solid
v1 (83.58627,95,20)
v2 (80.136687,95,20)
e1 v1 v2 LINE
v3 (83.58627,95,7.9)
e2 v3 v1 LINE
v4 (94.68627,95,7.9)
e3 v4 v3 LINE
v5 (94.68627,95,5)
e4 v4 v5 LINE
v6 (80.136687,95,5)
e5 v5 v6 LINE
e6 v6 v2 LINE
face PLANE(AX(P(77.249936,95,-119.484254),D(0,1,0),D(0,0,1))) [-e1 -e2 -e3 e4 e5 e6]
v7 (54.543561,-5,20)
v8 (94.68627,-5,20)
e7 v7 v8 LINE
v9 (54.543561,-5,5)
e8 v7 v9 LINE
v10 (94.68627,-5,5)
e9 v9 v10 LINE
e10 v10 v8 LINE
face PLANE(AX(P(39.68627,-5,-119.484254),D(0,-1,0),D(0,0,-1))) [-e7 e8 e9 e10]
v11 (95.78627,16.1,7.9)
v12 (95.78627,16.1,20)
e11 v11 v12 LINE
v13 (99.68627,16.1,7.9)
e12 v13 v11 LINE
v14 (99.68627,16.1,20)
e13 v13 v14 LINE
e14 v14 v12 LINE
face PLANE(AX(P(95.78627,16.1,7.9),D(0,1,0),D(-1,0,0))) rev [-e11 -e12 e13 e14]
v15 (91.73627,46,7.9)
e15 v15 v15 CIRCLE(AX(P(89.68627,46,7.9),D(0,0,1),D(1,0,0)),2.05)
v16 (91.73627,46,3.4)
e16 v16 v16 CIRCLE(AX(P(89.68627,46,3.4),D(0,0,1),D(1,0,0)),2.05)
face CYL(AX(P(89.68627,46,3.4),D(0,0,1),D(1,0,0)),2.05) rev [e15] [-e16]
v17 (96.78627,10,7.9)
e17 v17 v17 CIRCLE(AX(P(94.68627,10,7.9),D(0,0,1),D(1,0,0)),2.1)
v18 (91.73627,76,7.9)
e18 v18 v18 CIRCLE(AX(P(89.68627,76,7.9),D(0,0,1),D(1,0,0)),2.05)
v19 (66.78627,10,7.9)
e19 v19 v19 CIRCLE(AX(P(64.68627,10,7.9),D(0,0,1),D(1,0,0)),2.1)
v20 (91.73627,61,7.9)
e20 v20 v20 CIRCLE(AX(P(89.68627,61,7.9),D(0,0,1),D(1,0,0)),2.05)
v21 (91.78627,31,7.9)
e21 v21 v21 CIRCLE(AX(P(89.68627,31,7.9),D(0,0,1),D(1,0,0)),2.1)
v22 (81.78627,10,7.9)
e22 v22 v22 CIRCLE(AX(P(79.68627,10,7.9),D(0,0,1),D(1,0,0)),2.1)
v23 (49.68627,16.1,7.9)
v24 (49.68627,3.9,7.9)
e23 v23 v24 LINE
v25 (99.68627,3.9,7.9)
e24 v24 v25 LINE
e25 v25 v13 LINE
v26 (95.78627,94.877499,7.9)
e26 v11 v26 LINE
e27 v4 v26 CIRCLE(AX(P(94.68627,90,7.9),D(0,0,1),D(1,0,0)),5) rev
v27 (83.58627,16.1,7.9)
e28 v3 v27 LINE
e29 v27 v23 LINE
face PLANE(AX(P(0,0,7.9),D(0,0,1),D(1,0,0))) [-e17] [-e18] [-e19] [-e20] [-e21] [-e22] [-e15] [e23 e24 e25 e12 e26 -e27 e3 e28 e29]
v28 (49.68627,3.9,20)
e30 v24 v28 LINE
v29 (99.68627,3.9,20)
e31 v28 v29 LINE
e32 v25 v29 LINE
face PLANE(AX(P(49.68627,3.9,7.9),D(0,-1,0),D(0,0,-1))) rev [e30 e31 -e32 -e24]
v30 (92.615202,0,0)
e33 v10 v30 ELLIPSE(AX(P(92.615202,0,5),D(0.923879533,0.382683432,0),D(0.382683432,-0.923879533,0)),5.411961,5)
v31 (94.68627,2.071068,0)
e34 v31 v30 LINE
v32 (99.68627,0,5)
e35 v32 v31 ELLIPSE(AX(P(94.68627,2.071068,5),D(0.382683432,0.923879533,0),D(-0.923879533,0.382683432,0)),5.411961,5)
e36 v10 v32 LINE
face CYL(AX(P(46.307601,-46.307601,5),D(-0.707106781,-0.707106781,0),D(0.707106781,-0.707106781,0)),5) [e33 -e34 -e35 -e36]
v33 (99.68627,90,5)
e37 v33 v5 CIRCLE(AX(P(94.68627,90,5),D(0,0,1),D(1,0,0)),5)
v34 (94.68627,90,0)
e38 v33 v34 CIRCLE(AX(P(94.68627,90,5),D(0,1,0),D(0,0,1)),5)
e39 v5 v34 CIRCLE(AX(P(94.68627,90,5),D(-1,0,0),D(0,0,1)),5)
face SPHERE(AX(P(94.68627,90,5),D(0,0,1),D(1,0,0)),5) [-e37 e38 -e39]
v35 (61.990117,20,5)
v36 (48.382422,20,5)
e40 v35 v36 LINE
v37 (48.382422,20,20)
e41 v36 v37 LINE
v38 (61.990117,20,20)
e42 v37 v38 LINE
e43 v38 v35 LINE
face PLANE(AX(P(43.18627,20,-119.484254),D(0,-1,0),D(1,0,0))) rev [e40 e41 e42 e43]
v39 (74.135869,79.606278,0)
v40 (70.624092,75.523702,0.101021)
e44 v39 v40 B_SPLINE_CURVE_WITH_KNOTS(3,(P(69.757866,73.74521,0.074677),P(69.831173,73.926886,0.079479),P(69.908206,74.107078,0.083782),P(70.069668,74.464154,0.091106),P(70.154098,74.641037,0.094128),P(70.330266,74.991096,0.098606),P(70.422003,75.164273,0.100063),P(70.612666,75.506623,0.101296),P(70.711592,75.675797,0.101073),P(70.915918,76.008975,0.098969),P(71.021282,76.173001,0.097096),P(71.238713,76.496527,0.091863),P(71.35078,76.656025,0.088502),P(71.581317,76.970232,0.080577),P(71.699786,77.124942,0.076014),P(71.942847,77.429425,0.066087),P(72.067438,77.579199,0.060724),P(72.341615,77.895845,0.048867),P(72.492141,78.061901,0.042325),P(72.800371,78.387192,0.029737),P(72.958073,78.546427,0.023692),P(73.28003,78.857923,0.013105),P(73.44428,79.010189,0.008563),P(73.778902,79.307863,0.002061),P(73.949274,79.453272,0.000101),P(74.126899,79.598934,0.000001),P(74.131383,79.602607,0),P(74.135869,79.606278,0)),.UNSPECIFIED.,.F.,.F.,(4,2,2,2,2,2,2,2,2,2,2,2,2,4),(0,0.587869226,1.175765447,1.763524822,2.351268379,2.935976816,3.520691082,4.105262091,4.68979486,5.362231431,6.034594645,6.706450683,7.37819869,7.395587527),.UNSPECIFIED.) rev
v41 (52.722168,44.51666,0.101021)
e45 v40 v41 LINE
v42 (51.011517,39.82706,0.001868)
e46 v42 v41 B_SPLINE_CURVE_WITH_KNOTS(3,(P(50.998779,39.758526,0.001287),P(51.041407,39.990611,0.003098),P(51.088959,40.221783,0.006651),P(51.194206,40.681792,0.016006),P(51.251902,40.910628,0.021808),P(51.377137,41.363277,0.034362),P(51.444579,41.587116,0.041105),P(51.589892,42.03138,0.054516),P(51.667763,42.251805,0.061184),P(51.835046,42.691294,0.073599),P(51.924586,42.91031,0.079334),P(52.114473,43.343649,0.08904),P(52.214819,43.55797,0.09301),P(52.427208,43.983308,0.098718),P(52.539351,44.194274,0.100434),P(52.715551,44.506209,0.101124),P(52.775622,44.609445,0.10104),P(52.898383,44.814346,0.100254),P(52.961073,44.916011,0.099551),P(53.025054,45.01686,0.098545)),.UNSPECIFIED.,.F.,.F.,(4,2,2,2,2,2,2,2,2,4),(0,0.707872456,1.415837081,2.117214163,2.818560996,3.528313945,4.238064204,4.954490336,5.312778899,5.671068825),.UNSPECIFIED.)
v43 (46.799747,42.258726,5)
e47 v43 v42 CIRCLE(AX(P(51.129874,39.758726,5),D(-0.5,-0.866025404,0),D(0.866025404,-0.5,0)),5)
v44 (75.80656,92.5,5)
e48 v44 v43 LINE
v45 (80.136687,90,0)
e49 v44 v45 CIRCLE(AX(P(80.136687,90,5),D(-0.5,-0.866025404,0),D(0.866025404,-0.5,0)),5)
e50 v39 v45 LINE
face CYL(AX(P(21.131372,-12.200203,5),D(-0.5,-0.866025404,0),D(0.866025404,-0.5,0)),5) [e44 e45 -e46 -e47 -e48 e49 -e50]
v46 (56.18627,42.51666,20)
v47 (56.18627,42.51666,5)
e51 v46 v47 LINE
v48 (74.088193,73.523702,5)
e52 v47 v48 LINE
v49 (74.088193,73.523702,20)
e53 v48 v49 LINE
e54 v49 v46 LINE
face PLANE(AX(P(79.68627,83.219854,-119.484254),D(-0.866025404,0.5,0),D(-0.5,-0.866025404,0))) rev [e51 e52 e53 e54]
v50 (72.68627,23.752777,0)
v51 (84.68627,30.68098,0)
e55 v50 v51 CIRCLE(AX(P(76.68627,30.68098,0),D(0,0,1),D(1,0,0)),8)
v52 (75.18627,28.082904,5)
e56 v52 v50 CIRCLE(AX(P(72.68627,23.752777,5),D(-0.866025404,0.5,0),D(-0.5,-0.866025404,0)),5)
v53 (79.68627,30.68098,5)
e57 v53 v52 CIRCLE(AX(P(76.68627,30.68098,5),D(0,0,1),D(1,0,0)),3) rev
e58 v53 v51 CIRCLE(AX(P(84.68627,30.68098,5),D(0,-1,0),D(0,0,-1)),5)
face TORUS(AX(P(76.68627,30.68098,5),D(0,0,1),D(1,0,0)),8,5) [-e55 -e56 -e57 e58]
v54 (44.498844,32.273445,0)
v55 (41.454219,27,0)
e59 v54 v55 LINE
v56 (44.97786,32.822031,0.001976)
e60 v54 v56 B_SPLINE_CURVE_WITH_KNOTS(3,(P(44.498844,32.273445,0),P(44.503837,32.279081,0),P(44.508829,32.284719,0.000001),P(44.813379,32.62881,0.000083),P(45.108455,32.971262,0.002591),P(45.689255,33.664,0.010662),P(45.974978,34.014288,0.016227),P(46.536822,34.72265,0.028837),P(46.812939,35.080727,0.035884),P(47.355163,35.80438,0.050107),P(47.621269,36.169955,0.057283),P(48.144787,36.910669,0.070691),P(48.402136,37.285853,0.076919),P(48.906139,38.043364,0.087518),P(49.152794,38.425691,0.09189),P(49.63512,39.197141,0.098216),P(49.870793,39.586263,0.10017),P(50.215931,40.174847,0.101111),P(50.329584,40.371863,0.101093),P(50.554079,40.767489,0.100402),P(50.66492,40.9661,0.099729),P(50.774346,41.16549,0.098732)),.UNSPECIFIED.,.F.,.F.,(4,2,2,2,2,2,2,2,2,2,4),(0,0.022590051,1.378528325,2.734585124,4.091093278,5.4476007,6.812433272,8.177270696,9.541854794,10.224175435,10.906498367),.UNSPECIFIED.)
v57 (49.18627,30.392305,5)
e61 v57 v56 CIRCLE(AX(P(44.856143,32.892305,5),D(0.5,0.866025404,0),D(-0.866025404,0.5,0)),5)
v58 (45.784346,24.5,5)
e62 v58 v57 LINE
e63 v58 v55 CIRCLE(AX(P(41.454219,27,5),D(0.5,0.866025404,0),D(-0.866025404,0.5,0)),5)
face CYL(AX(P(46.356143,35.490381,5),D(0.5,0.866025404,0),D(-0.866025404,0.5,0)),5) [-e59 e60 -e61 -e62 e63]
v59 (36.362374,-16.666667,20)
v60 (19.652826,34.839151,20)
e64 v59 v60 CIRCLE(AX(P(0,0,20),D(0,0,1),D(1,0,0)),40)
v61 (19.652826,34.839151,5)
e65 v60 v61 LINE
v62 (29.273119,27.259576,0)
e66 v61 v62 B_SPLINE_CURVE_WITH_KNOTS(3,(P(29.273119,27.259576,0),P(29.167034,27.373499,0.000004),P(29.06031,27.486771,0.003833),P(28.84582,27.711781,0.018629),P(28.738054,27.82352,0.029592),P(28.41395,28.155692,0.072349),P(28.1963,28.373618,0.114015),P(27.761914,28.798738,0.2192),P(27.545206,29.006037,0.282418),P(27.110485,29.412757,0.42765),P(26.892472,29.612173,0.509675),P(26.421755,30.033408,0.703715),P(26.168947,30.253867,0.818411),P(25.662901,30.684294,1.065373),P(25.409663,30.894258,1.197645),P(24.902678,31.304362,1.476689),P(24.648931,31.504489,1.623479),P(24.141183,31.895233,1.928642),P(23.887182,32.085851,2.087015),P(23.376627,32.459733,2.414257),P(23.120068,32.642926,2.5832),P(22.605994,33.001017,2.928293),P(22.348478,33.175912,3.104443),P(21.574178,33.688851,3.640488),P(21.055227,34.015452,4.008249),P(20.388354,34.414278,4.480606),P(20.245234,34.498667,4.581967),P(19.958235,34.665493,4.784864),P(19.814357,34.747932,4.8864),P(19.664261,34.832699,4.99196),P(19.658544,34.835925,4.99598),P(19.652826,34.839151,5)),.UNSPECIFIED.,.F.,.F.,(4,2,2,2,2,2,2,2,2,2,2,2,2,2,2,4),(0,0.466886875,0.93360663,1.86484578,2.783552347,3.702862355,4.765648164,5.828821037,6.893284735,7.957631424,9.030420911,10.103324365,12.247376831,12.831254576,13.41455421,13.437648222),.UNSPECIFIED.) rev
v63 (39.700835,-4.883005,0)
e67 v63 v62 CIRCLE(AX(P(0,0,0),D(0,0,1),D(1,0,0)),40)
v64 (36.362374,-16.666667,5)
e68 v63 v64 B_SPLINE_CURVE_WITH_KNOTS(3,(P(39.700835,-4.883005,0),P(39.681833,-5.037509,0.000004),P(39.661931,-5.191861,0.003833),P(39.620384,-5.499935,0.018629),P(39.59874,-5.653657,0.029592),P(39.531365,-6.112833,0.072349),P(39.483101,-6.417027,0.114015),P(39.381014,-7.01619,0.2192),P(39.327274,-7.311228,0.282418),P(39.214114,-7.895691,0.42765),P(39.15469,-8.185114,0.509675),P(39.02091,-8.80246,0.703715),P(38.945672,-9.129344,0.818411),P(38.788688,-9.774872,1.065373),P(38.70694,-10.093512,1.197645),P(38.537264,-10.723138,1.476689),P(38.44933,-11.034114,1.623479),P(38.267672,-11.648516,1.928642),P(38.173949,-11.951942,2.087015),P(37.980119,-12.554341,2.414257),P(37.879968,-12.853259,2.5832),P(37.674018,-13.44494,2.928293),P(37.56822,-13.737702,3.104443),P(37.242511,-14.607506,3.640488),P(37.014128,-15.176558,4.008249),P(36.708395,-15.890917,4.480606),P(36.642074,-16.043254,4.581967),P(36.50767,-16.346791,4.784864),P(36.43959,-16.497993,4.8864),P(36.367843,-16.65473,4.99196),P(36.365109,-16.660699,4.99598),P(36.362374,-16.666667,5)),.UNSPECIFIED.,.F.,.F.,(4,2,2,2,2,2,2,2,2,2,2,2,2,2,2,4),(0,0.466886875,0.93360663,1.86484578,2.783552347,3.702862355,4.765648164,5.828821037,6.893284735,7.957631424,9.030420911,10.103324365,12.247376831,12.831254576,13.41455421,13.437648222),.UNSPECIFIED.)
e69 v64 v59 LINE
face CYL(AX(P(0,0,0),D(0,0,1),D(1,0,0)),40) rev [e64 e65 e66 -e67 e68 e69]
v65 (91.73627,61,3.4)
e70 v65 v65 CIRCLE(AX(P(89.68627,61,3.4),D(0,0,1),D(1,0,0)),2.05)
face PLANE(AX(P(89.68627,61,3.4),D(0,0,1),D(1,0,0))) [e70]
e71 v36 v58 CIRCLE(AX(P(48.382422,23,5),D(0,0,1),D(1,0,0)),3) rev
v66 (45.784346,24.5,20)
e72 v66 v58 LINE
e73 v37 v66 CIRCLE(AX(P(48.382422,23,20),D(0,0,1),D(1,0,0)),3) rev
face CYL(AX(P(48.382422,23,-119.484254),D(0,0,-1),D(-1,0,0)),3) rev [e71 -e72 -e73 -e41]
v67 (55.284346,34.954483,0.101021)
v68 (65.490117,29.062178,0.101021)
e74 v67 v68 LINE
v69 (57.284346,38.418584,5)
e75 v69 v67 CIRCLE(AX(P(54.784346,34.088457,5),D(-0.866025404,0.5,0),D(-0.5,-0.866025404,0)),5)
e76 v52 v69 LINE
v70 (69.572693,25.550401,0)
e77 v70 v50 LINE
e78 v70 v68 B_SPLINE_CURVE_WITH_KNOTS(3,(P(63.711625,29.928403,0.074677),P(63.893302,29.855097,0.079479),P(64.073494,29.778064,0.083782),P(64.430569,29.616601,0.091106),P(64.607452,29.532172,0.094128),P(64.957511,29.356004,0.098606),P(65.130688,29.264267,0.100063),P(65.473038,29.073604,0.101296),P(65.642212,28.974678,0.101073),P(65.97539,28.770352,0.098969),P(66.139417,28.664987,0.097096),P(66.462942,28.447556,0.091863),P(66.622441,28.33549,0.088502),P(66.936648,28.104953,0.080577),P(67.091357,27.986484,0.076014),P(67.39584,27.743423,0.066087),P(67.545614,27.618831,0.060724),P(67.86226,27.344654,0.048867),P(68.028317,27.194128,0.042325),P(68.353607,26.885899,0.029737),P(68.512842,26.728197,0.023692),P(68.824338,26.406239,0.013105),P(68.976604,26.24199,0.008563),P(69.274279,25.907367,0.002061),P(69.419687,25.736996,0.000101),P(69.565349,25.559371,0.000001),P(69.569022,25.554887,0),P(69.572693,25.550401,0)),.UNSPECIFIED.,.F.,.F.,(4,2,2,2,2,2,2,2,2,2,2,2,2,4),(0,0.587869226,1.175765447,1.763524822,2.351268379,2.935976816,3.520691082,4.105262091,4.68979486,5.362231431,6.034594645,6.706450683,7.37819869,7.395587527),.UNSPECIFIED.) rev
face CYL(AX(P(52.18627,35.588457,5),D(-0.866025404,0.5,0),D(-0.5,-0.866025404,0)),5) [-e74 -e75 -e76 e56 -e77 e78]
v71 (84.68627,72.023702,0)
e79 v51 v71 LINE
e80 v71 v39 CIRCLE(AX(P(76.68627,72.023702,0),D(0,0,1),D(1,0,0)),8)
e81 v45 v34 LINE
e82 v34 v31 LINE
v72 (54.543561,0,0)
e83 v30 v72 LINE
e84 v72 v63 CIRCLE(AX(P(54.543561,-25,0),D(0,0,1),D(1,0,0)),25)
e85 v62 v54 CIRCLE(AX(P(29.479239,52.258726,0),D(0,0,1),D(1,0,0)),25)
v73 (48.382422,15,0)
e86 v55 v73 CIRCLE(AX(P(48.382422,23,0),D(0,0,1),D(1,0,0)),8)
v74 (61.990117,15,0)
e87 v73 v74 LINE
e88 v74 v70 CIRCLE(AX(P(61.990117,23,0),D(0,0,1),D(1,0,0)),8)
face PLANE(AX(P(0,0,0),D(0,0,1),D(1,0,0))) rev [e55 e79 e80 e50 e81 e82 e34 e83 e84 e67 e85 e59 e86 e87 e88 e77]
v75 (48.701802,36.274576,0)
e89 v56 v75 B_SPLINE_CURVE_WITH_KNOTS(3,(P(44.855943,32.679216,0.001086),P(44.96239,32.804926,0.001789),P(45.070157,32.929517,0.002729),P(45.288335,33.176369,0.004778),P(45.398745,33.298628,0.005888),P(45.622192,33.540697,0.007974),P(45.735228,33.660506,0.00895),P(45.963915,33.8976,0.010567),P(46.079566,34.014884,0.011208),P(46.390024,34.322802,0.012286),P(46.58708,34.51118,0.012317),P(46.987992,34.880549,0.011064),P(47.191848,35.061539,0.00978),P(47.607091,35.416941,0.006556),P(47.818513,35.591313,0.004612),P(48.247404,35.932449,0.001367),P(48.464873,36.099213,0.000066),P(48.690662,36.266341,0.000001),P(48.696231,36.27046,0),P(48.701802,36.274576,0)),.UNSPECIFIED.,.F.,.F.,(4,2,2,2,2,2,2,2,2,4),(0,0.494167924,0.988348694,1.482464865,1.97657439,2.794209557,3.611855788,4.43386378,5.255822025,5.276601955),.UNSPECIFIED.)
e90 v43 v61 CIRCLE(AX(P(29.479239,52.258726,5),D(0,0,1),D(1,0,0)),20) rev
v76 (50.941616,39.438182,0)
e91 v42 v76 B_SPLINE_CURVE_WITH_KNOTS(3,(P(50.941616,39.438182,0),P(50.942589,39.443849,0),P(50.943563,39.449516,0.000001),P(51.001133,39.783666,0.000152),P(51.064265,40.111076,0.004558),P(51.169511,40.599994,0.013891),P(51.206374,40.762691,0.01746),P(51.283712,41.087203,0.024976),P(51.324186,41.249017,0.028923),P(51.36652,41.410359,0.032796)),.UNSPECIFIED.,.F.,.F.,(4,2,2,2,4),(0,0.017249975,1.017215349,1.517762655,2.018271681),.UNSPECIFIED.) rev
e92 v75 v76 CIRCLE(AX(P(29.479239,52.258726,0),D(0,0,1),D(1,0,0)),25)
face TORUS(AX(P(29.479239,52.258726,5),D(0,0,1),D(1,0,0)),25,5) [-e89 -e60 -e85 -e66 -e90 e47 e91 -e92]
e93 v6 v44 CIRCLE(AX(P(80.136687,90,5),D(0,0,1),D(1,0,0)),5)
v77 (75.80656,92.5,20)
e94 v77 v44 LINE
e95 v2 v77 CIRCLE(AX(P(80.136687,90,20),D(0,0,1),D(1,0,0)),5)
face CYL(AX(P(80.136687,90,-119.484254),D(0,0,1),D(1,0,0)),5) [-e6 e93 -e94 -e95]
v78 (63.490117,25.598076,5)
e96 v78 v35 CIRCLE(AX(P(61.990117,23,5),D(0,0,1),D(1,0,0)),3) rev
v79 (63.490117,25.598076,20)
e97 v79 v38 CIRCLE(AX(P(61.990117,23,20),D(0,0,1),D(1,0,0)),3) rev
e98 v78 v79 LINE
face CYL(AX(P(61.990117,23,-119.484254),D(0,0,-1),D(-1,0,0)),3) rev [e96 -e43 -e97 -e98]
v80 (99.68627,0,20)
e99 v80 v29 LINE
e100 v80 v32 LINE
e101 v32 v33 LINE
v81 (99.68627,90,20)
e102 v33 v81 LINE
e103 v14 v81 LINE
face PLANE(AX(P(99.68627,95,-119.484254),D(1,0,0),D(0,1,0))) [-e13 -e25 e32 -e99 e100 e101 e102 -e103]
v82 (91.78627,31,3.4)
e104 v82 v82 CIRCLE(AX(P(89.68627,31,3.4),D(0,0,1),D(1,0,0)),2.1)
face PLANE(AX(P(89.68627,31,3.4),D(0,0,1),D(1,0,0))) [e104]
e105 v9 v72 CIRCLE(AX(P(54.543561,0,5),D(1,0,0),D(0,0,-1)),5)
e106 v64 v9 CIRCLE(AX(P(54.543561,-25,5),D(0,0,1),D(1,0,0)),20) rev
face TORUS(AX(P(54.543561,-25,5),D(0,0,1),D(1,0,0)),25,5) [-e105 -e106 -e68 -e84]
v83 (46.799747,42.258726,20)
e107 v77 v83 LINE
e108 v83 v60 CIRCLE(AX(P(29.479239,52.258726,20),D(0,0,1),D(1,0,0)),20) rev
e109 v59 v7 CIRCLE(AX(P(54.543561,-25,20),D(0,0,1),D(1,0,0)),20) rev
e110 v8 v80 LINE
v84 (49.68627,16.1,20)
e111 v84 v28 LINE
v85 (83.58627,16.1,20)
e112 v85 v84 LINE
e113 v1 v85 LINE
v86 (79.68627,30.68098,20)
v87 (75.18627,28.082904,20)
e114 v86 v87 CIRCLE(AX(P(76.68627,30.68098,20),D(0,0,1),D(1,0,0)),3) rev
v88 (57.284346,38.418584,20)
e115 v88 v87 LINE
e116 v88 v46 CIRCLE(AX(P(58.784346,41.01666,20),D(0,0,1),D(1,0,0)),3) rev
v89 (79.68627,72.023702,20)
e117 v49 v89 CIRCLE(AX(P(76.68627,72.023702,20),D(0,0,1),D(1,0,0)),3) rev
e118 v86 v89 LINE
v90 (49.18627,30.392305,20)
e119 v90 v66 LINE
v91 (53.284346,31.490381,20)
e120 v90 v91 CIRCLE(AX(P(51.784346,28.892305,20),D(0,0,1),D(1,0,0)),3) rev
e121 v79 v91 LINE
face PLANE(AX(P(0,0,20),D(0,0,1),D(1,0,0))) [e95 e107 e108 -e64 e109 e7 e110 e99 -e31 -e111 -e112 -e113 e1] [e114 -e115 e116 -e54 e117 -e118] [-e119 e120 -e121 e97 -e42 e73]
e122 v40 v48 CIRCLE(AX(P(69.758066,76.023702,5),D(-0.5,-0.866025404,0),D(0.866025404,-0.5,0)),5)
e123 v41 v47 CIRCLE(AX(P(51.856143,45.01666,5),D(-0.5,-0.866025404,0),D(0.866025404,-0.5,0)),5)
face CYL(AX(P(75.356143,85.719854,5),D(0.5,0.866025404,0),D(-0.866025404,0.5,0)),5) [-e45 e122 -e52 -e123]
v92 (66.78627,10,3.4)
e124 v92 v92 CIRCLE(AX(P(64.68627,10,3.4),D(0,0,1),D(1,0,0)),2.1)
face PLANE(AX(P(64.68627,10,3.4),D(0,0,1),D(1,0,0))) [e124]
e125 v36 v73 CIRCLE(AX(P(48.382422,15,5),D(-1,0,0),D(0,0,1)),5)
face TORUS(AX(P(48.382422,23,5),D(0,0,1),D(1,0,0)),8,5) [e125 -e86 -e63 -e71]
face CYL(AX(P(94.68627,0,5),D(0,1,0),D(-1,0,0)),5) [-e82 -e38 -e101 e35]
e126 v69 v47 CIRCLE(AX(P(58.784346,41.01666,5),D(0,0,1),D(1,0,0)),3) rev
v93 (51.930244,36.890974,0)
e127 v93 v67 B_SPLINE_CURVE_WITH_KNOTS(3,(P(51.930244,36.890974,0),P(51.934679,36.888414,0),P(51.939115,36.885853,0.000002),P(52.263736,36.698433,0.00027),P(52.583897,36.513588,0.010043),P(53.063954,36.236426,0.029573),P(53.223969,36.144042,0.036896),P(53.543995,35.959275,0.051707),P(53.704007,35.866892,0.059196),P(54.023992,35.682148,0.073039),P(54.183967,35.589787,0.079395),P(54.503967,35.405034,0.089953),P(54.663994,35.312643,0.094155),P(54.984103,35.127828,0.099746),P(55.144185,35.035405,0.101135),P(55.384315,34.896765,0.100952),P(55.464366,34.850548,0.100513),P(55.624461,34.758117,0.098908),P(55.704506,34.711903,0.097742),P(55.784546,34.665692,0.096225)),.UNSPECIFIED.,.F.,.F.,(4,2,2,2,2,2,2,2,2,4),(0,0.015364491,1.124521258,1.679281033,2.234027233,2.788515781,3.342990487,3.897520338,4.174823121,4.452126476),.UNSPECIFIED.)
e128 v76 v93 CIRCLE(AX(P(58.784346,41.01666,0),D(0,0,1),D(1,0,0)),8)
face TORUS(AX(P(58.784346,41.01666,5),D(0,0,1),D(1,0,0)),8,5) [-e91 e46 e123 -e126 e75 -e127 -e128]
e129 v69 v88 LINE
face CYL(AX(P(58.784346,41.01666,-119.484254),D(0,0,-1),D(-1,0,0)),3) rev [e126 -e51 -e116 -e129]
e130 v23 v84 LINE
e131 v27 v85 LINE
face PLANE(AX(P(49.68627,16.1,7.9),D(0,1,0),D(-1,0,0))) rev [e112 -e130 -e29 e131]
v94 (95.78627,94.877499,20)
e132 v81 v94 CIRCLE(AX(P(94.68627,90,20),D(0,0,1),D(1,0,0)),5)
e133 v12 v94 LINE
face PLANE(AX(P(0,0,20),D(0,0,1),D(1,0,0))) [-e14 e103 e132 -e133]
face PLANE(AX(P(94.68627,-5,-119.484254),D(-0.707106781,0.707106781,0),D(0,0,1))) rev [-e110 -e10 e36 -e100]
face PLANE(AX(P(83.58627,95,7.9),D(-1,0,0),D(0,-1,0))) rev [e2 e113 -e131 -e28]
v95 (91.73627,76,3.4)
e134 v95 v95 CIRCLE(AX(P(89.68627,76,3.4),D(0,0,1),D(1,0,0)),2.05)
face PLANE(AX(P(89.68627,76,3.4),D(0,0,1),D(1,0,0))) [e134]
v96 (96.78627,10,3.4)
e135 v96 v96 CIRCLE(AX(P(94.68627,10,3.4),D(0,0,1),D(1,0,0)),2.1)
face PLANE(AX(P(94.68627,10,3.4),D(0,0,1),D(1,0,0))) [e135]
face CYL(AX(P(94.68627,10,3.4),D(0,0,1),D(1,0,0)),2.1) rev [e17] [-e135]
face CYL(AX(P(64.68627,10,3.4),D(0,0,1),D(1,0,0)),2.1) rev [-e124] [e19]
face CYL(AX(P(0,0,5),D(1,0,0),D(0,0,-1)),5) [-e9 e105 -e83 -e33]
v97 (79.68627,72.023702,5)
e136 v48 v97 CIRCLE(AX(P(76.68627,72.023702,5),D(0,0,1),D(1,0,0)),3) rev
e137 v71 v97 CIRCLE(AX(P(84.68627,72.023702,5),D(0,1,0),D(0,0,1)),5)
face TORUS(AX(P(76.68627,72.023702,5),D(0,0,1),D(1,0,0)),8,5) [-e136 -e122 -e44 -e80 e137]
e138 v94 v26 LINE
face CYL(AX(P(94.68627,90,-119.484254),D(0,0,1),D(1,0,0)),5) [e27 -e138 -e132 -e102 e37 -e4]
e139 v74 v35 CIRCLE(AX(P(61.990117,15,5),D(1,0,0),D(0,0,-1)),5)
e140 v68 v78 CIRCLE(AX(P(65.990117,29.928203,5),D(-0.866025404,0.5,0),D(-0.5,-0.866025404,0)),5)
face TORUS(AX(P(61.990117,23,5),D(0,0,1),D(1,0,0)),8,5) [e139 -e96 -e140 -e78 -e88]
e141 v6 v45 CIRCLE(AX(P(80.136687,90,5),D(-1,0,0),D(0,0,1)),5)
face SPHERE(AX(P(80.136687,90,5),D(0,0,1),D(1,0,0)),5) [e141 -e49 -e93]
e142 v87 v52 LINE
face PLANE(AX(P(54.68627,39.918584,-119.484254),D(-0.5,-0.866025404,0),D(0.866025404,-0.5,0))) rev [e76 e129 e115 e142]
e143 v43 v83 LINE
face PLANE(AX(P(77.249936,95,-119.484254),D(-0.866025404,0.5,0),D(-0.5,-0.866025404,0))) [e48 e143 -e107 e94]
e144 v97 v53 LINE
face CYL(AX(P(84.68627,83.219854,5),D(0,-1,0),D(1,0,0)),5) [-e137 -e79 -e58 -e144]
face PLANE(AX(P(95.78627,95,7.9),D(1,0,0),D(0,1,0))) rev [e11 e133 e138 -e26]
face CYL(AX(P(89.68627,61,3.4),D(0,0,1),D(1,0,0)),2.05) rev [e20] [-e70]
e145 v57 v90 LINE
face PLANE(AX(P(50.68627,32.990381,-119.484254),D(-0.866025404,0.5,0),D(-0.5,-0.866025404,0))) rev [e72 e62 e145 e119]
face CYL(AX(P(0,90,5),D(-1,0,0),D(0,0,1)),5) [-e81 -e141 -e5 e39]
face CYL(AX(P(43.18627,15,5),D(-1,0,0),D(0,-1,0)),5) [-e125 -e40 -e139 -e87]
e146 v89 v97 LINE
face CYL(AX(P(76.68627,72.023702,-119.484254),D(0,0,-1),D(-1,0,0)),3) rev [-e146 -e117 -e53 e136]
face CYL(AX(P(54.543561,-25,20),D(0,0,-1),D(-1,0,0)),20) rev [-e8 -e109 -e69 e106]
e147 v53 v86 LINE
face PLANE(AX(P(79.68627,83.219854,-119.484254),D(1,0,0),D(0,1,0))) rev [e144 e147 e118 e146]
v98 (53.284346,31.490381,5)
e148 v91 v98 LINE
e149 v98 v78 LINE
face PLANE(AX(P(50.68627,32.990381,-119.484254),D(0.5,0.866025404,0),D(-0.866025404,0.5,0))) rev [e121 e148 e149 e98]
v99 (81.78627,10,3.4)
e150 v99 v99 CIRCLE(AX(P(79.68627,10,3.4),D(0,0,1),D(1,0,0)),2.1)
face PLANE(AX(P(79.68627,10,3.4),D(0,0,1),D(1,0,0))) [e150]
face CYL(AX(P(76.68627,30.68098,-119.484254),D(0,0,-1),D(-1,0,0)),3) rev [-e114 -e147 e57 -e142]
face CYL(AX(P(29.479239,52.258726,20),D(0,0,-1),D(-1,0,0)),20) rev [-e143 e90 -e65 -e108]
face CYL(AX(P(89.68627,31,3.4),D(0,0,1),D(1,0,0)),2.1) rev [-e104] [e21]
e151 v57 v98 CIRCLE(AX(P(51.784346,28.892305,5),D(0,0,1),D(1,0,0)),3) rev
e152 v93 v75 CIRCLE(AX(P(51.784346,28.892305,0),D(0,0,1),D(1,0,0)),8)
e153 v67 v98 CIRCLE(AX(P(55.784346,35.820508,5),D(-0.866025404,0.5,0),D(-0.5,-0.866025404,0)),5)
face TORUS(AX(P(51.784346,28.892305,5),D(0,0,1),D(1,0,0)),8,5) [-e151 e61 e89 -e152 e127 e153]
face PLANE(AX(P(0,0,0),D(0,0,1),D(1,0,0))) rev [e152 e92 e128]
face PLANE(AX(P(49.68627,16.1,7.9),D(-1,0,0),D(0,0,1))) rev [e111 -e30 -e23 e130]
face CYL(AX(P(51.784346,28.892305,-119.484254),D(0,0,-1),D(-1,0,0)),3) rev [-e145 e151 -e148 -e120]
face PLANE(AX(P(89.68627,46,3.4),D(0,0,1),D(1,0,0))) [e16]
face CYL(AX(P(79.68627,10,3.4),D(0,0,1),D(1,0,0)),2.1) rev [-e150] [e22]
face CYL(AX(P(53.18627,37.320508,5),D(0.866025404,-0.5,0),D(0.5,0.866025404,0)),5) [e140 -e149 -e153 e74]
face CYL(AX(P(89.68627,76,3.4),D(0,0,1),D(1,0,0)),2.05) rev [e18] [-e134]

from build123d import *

# Parameters (mm, degrees)
SKETCH_1_R          = 40
SKETCH_1_R_2        = 32.5
EXTRUDE_1_DEPTH     = 20
EXTRUDE_START       = -20
SKETCH_4_R          = 1.55
EXTRUDE_2_DEPTH     = 20
FILLET_2_R          = 20
CHAMFER_1_SIZE      = 5
FILLET_4_R          = 3
FILLET_5_R          = 5
SKETCH_6_R          = 40
CUT_EXTRUDE_1_DEPTH = 140.14866999
CUT_EXTRUDE_2_DEPTH = 12.1
SKETCH_8_R          = 2.1
SKETCH_8_R_2        = 2.05
CUT_EXTRUDE_3_DEPTH = 4.5
SKETCH_9_R          = 1.55
EXTRUDE_3_DEPTH     = 3.4
FILLET_6_R          = 5


with BuildPart() as part:
    # 草图1 → 凸台-拉伸1 (new body)
    with BuildSketch(Plane.XY):
        Circle(SKETCH_1_R)
        Circle(SKETCH_1_R_2, mode=Mode.SUBTRACT)
    extrude(amount=EXTRUDE_1_DEPTH)

    # 草图4 → 凸台-拉伸2 (add)
    with BuildSketch(Plane.XY.offset(20).offset(EXTRUDE_START)):
        with BuildLine():
            Line((39.686269666, -5), (99.686269666, -5))
            Line((99.686269666, -5), (99.686269666, 95))
            Line((99.686269666, 95), (77.249935548, 95))
            Line((77.249935548, 95), (34.29141524, 20.593660209))
            ThreePointArc((34.29141524, 20.593660209), (39.139919861, 8.25025292), (39.686269666, -5))
        make_face()
        with Locations((79.686269666, 10)):
            Circle(SKETCH_4_R, mode=Mode.SUBTRACT)
        with Locations((94.686269666, 10)):
            Circle(SKETCH_4_R, mode=Mode.SUBTRACT)
        with Locations((64.686269666, 10)):
            Circle(SKETCH_4_R, mode=Mode.SUBTRACT)
        with Locations((89.686269666, 76)):
            Circle(SKETCH_4_R, mode=Mode.SUBTRACT)
        with Locations((89.686269666, 61)):
            Circle(SKETCH_4_R, mode=Mode.SUBTRACT)
        with Locations((89.686269666, 46)):
            Circle(SKETCH_4_R, mode=Mode.SUBTRACT)
        with Locations((89.686269666, 31)):
            Circle(SKETCH_4_R, mode=Mode.SUBTRACT)
        Polygon((54.686269666, 39.918584287), (79.686269666, 25.484827557), (79.686269666, 83.219854476), align=None, mode=Mode.SUBTRACT)
        Polygon((50.686269666, 32.990381057), (73.186269666, 20), (43.186269666, 20), align=None, mode=Mode.SUBTRACT)
    extrude(amount=EXTRUDE_2_DEPTH)

    # 圆角2
    fillet_2_edges = [part.edges().sort_by_distance(p)[0] for p in [
        (34.29141524, 20.593660209, 10),
        (39.686269666, -5, 10),
    ]]
    fillet(fillet_2_edges, radius=FILLET_2_R)

    # 倒角1
    chamfer_1_edges = [part.edges().sort_by_distance(p)[0] for p in [
        (99.686269666, -5, 10),
    ]]
    chamfer(chamfer_1_edges, length=CHAMFER_1_SIZE)

    # 圆角4
    fillet_4_edges = [part.edges().sort_by_distance(p)[0] for p in [
        (54.686269666, 39.918584287, 10),
        (79.686269666, 25.484827557, 10),
        (79.686269666, 83.219854476, 10),
        (73.186269666, 20, 10),
        (50.686269666, 32.990381057, 10),
        (43.186269666, 20, 10),
    ]]
    fillet(fillet_4_edges, radius=FILLET_4_R)

    # 圆角5
    fillet_5_edges = [part.edges().sort_by_distance(p)[0] for p in [
        (77.249935548, 95, 10),
        (99.686269666, 95, 10),
    ]]
    fillet(fillet_5_edges, radius=FILLET_5_R)

    # 草图6 → 切除-拉伸1 (cut, through all)
    with BuildSketch(Plane.XY.offset(20)):
        Circle(SKETCH_6_R)
    extrude(amount=-CUT_EXTRUDE_1_DEPTH, mode=Mode.SUBTRACT)

    # 草图7 → 切除-拉伸2 (cut)
    with BuildSketch(Plane.XY.offset(20)):
        Polygon((49.686269666, 16.1), (83.586269666, 16.1), (83.586269666, 95), (95.786269666, 95), (95.786269666, 16.1), (99.686269666, 16.1), (99.686269666, 3.9), (49.686269666, 3.9), align=None)
    extrude(amount=-CUT_EXTRUDE_2_DEPTH, mode=Mode.SUBTRACT)

    # 草图8 → 切除-拉伸3 (cut)
    with BuildSketch(Plane.XY.offset(7.9)):
        with Locations((94.686269666, 10)):
            Circle(SKETCH_8_R)
        with Locations((89.686269666, 31)):
            Circle(SKETCH_8_R)
        with Locations((79.686269666, 10)):
            Circle(SKETCH_8_R)
        with Locations((64.686269666, 10)):
            Circle(SKETCH_8_R)
        with Locations((89.686269666, 46)):
            Circle(SKETCH_8_R_2)
        with Locations((89.686269666, 61)):
            Circle(SKETCH_8_R_2)
        with Locations((89.686269666, 76)):
            Circle(SKETCH_8_R_2)
    extrude(amount=-CUT_EXTRUDE_3_DEPTH, mode=Mode.SUBTRACT)

    # 草图9 → 凸台-拉伸3 (add)
    with BuildSketch(Plane(origin=(0, 0, 0), x_dir=(-1, 0, 0), z_dir=(0, 0, -1))):
        with Locations((-89.686269666, 76)):
            Circle(SKETCH_9_R)
        with Locations((-89.686269666, 61)):
            Circle(SKETCH_9_R)
        with Locations((-89.686269666, 46)):
            Circle(SKETCH_9_R)
        with Locations((-89.686269666, 31)):
            Circle(SKETCH_9_R)
        with Locations((-79.686269666, 10)):
            Circle(SKETCH_9_R)
        with Locations((-64.686269666, 10)):
            Circle(SKETCH_9_R)
        with Locations((-94.686269666, 10)):
            Circle(SKETCH_9_R)
    extrude(amount=-EXTRUDE_3_DEPTH)

    # 圆角6
    # the kernel refuses this fillet: 5 mm, written as the material it takes off along each edge
    with BuildSketch(Plane(origin=(94.686269666, 95, 0), x_dir=(0, -1, 0), z_dir=(-1, 0, 0))) as fillet_6_piece_1:
        with BuildLine():
            CenterArc((FILLET_6_R, FILLET_6_R), FILLET_6_R, 180, 90)
            Line((0, FILLET_6_R), (0, 0))
            Line((0, 0), (FILLET_6_R, 0))
        make_face()
    extrude(amount=14.549582772, mode=Mode.SUBTRACT)
    with BuildSketch(Plane(origin=(99.686269666, -12.5, 0), x_dir=(-1, 0, 0), z_dir=(0, 1, 0))) as fillet_6_piece_2:
        with BuildLine():
            CenterArc((FILLET_6_R, FILLET_6_R), FILLET_6_R, 180, 90)
            Line((0, FILLET_6_R), (0, 0))
            Line((0, 0), (FILLET_6_R, 0))
        make_face()
    extrude(amount=102.5, mode=Mode.SUBTRACT)
    with BuildSketch(Plane(origin=(94.686269666, 90, 0), x_dir=(1, 0, 0), z_dir=(0, -1, 0))) as fillet_6_piece_3:
        with BuildLine():
            CenterArc((5 - FILLET_6_R, FILLET_6_R), FILLET_6_R, 270, 90)
            Line((5, FILLET_6_R), (5, 0))
            Line((5, 0), (5 - FILLET_6_R, 0))
        make_face()
    revolve(axis=Axis((94.686269666, 90, 0), (0, 0, 1)), revolution_arc=90, mode=Mode.SUBTRACT)
    with BuildSketch(Plane(origin=(80.136686894, 90, 0), x_dir=(0, 1, 0), z_dir=(1, 0, 0))) as fillet_6_piece_4:
        with BuildLine():
            CenterArc((5 - FILLET_6_R, FILLET_6_R), FILLET_6_R, 270, 90)
            Line((5, FILLET_6_R), (5, 0))
            Line((5, 0), (5 - FILLET_6_R, 0))
        make_face()
    revolve(axis=Axis((80.136686894, 90, 0), (0, 0, 1)), revolution_arc=60, mode=Mode.SUBTRACT)
    with BuildSketch(Plane(origin=(75.806559875, 92.5, 0), x_dir=(0.866025403784436, -0.5000000000000043, 0), z_dir=(-0.5000000000000043, -0.8660254037844362, 0))) as fillet_6_piece_5:
        with BuildLine():
            CenterArc((FILLET_6_R, FILLET_6_R), FILLET_6_R, 180, 90)
            Line((0, FILLET_6_R), (0, 0))
            Line((0, 0), (FILLET_6_R, 0))
        make_face()
    extrude(amount=58.013625798, mode=Mode.SUBTRACT)
    with BuildSketch(Plane(origin=(29.479238901, 52.258726294, 0), x_dir=(-0.9081540300879987, -0.4186361876796205, 0), z_dir=(-0.4186361876796205, 0.9081540300879987, 0))) as fillet_6_piece_6:
        with BuildLine():
            CenterArc((20 + FILLET_6_R, FILLET_6_R), FILLET_6_R, 180, 90)
            Line((20, FILLET_6_R), (20, 0))
            Line((20, 0), (20 + FILLET_6_R, 0))
        make_face()
    revolve(axis=Axis((29.479238901, 52.258726294, 0), (0, 0, 1)), revolution_arc=125.251485778, mode=Mode.SUBTRACT)
    with BuildSketch(Plane(origin=(54.543560573, -25, 0), x_dir=(-0.9809784270668743, -0.19411678348200886, 0), z_dir=(0.19411678348200886, -0.9809784270668743, 0))) as fillet_6_piece_7:
        with BuildLine():
            CenterArc((20 + FILLET_6_R, -FILLET_6_R), FILLET_6_R, 90, 90)
            Line((20, -FILLET_6_R), (20, 0))
            Line((20, 0), (20 + FILLET_6_R, 0))
        make_face()
    revolve(axis=Axis((54.543560573, -25, 0), (0, 0, -1)), revolution_arc=101.193133167, mode=Mode.SUBTRACT)
    with BuildSketch(Plane(origin=(54.543560573, -5, 0), x_dir=(0, 1, 0), z_dir=(1, 0, 0))) as fillet_6_piece_8:
        with BuildLine():
            CenterArc((FILLET_6_R, FILLET_6_R), FILLET_6_R, 180, 90)
            Line((0, FILLET_6_R), (0, 0))
            Line((0, 0), (FILLET_6_R, 0))
        make_face()
    extrude(amount=52.642709093, mode=Mode.SUBTRACT)
    with BuildSketch(Plane(origin=(85.847434901, -13.838834765, 0), x_dir=(-0.7071067811865476, 0.7071067811865476, 0), z_dir=(0.7071067811865476, 0.7071067811865476, 0))) as fillet_6_piece_9:
        with BuildLine():
            CenterArc((FILLET_6_R, FILLET_6_R), FILLET_6_R, 180, 90)
            Line((0, FILLET_6_R), (0, 0))
            Line((0, 0), (FILLET_6_R, 0))
        make_face()
    extrude(amount=32.071067812, mode=Mode.SUBTRACT)
    with BuildSketch(Plane(origin=(61.990117243, 20, 0), x_dir=(0, -1, 0), z_dir=(-1, 0, 0))) as fillet_6_piece_10:
        with BuildLine():
            CenterArc((FILLET_6_R, FILLET_6_R), FILLET_6_R, 180, 90)
            Line((0, FILLET_6_R), (0, 0))
            Line((0, 0), (FILLET_6_R, 0))
        make_face()
    extrude(amount=13.607695155, mode=Mode.SUBTRACT)
    with BuildSketch(Plane(origin=(45.784345877, 24.5, 0), x_dir=(-0.8660254037844366, 0.5000000000000036, 0), z_dir=(0.5000000000000036, 0.8660254037844366, 0))) as fillet_6_piece_11:
        with BuildLine():
            CenterArc((FILLET_6_R, FILLET_6_R), FILLET_6_R, 180, 90)
            Line((0, FILLET_6_R), (0, 0))
            Line((0, 0), (FILLET_6_R, 0))
        make_face()
    extrude(amount=6.803847577, mode=Mode.SUBTRACT)
    with BuildSketch(Plane(origin=(53.284345877, 31.490381057, 0), x_dir=(0.5000000000000044, 0.8660254037844362, 0), z_dir=(0.8660254037844362, -0.5000000000000044, 0))) as fillet_6_piece_12:
        with BuildLine():
            CenterArc((FILLET_6_R, FILLET_6_R), FILLET_6_R, 180, 90)
            Line((0, FILLET_6_R), (0, 0))
            Line((0, 0), (FILLET_6_R, 0))
        make_face()
    extrude(amount=11.784609691, mode=Mode.SUBTRACT)
    with BuildSketch(Plane(origin=(57.284345877, 38.418584287, 0), x_dir=(-0.5000000000000043, -0.8660254037844362, 0), z_dir=(0.8660254037844362, -0.5000000000000043, 0))) as fillet_6_piece_13:
        with BuildLine():
            CenterArc((FILLET_6_R, -FILLET_6_R), FILLET_6_R, 90, 90)
            Line((0, -FILLET_6_R), (0, 0))
            Line((0, 0), (FILLET_6_R, 0))
        make_face()
    extrude(amount=20.671361037, mode=Mode.SUBTRACT)
    with BuildSketch(Plane(origin=(74.088193455, 73.523702054, 0), x_dir=(-0.8660254037844362, 0.5000000000000044, 0), z_dir=(-0.5000000000000044, -0.8660254037844362, 0))) as fillet_6_piece_14:
        with BuildLine():
            CenterArc((FILLET_6_R, -FILLET_6_R), FILLET_6_R, 90, 90)
            Line((0, -FILLET_6_R), (0, 0))
            Line((0, 0), (FILLET_6_R, 0))
        make_face()
    extrude(amount=35.803847577, mode=Mode.SUBTRACT)
    with BuildSketch(Plane(origin=(79.686269666, 30.68097998, 0), x_dir=(1, 0, 0), z_dir=(0, 1, 0))) as fillet_6_piece_15:
        with BuildLine():
            CenterArc((FILLET_6_R, -FILLET_6_R), FILLET_6_R, 90, 90)
            Line((0, -FILLET_6_R), (0, 0))
            Line((0, 0), (FILLET_6_R, 0))
        make_face()
    extrude(amount=41.342722074, mode=Mode.SUBTRACT)
    with BuildSketch(Plane(origin=(48.382422089, 23, 0), x_dir=(-0.8660254037844359, 0.5000000000000046, 0), z_dir=(0.5000000000000046, 0.8660254037844359, 0))) as fillet_6_piece_16:
        with BuildLine():
            CenterArc((3 + FILLET_6_R, FILLET_6_R), FILLET_6_R, 180, 90)
            Line((3, FILLET_6_R), (3, 0))
            Line((3, 0), (3 + FILLET_6_R, 0))
        make_face()
    revolve(axis=Axis((48.382422089, 23, 0), (0, 0, 1)), revolution_arc=120, mode=Mode.SUBTRACT)
    with BuildSketch(Plane(origin=(51.784345877, 28.892304845, 0), x_dir=(-0.8660254037844369, 0.5000000000000028, 0), z_dir=(-0.5000000000000028, -0.8660254037844369, 0))) as fillet_6_piece_17:
        with BuildLine():
            CenterArc((3 + FILLET_6_R, -FILLET_6_R), FILLET_6_R, 90, 90)
            Line((3, -FILLET_6_R), (3, 0))
            Line((3, 0), (3 + FILLET_6_R, 0))
        make_face()
    revolve(axis=Axis((51.784345877, 28.892304845, 0), (0, 0, -1)), revolution_arc=90, mode=Mode.SUBTRACT)
    with BuildSketch(Plane(origin=(61.990117243, 23, 0), x_dir=(0.5000000000000046, 0.866025403784436, 0), z_dir=(-0.866025403784436, 0.5000000000000046, 0))) as fillet_6_piece_18:
        with BuildLine():
            CenterArc((3 + FILLET_6_R, -FILLET_6_R), FILLET_6_R, 90, 90)
            Line((3, -FILLET_6_R), (3, 0))
            Line((3, 0), (3 + FILLET_6_R, 0))
        make_face()
    revolve(axis=Axis((61.990117243, 23, 0), (0, 0, -1)), revolution_arc=150, mode=Mode.SUBTRACT)
    with BuildSketch(Plane(origin=(58.784345877, 41.016660498, 0), x_dir=(-0.8660254037844359, 0.5000000000000046, 0), z_dir=(0.5000000000000046, 0.8660254037844359, 0))) as fillet_6_piece_19:
        with BuildLine():
            CenterArc((3 + FILLET_6_R, FILLET_6_R), FILLET_6_R, 180, 90)
            Line((3, FILLET_6_R), (3, 0))
            Line((3, 0), (3 + FILLET_6_R, 0))
        make_face()
    revolve(axis=Axis((58.784345877, 41.016660498, 0), (0, 0, 1)), revolution_arc=90, mode=Mode.SUBTRACT)
    with BuildSketch(Plane(origin=(76.686269666, 72.023702054, 0), x_dir=(-0.8660254037844354, 0.5000000000000056, 0), z_dir=(-0.5000000000000056, -0.8660254037844354, 0))) as fillet_6_piece_20:
        with BuildLine():
            CenterArc((3 + FILLET_6_R, -FILLET_6_R), FILLET_6_R, 90, 90)
            Line((3, -FILLET_6_R), (3, 0))
            Line((3, 0), (3 + FILLET_6_R, 0))
        make_face()
    revolve(axis=Axis((76.686269666, 72.023702054, 0), (0, 0, -1)), revolution_arc=150, mode=Mode.SUBTRACT)
    with BuildSketch(Plane(origin=(76.686269666, 30.68097998, 0), x_dir=(1, 0, 0), z_dir=(0, 1, 0))) as fillet_6_piece_21:
        with BuildLine():
            CenterArc((3 + FILLET_6_R, -FILLET_6_R), FILLET_6_R, 90, 90)
            Line((3, -FILLET_6_R), (3, 0))
            Line((3, 0), (3 + FILLET_6_R, 0))
        make_face()
    revolve(axis=Axis((76.686269666, 30.68097998, 0), (0, 0, -1)), revolution_arc=120, mode=Mode.SUBTRACT)


solid = part.part
